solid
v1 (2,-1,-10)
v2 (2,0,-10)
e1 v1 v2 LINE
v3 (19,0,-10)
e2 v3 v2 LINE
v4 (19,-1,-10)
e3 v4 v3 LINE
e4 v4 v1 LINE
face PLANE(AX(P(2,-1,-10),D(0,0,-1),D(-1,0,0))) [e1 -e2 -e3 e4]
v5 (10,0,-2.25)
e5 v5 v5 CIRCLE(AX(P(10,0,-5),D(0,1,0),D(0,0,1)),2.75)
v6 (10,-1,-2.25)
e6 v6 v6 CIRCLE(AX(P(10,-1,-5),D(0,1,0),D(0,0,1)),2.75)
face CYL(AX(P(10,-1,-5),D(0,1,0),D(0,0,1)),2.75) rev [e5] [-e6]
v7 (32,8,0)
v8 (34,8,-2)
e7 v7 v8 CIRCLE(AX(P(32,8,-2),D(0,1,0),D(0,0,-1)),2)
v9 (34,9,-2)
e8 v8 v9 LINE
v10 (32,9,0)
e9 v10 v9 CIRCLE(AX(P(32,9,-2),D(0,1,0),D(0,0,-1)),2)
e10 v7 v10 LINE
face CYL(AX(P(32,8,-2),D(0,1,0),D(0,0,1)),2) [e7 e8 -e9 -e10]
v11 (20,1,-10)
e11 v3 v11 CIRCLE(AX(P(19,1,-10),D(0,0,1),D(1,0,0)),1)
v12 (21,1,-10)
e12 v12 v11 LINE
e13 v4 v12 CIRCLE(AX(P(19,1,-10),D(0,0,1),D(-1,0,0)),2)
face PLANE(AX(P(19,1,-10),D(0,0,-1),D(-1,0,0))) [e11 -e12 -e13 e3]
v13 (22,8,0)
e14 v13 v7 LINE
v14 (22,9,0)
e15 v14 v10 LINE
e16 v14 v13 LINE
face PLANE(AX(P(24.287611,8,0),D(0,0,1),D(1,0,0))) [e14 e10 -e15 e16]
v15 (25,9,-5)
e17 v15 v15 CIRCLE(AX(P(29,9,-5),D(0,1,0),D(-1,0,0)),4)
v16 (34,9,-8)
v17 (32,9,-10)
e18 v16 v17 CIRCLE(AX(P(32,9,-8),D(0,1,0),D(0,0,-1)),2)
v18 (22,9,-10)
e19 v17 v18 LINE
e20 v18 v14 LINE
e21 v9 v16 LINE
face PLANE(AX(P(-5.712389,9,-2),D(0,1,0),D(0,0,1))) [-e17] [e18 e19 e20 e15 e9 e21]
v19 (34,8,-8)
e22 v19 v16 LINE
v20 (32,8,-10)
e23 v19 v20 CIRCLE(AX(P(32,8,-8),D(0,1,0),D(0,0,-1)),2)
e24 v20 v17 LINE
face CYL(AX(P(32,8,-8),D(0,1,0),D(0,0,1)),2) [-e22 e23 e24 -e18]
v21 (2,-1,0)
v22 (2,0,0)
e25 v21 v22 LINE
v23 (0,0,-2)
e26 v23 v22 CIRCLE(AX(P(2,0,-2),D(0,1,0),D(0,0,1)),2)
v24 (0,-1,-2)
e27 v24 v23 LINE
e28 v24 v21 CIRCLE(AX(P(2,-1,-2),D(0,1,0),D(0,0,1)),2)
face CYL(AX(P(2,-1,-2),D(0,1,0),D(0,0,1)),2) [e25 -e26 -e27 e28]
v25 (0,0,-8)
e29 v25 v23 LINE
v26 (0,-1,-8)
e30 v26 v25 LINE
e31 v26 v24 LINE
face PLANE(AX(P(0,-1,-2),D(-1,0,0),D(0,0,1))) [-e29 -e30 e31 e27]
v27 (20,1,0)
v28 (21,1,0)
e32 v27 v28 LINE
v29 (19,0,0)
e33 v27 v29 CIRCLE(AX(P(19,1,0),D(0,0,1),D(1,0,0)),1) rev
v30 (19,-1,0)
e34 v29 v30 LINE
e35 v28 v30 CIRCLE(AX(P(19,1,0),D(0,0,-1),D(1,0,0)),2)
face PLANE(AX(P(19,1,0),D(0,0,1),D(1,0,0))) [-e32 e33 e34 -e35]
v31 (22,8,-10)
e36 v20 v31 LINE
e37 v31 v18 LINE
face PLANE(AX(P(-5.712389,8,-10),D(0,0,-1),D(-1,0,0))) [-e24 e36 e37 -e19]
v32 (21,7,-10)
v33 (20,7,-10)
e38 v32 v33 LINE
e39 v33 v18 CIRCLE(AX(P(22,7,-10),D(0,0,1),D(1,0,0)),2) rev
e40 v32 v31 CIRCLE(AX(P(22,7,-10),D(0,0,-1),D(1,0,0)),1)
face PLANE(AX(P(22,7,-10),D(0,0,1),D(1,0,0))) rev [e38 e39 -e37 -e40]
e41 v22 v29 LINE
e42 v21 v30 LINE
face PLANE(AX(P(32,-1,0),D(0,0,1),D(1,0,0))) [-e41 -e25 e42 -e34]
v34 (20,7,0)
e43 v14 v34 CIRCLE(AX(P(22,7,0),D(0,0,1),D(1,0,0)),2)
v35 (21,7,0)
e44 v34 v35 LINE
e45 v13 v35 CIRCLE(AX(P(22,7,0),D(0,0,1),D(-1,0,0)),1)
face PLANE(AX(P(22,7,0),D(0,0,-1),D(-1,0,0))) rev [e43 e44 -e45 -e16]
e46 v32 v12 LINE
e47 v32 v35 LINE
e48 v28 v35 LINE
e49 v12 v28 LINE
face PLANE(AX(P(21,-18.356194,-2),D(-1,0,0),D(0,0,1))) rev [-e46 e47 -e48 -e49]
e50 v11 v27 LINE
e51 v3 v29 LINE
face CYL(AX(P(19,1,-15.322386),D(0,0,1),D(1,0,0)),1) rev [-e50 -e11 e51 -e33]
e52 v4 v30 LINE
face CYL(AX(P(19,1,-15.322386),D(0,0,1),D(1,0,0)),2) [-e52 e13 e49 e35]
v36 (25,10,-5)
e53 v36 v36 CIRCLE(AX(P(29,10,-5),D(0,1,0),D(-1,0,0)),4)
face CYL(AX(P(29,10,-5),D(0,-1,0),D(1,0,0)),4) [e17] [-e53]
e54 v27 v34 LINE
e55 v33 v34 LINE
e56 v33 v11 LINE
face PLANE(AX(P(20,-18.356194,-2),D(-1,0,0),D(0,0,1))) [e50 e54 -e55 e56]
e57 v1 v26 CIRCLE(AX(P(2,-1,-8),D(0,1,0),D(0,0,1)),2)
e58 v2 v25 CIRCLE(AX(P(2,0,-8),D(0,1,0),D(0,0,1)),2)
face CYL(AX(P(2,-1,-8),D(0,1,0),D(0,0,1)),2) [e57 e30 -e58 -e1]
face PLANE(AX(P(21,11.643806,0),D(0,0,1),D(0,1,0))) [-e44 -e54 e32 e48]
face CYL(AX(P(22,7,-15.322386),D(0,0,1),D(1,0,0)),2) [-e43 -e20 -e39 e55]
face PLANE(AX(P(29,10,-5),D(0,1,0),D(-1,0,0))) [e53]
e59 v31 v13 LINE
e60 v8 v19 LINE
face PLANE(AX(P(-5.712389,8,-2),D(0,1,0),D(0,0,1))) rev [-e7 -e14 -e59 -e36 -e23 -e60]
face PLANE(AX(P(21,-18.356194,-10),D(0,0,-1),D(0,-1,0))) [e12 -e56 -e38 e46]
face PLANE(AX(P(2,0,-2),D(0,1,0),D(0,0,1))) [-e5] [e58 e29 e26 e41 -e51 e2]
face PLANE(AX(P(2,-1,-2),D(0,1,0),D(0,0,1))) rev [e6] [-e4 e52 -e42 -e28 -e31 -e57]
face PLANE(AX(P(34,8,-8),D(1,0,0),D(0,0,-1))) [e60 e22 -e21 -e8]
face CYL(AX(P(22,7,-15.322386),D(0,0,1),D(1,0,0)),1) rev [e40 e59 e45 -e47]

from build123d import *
from build123d.topology import SkipClean

# Parameters (mm, degrees)
SKETCH1_R           = 2.75
BASE_FLANGE1_DEPTH  = 1
JOG1_START          = -10
JOG1_DEPTH          = 10
JOG1_START_2        = -8
JOG1_2_DEPTH        = 6
JOG1_START_3        = 7
JOG1_3_DEPTH        = 1.974011807
JOG1_4_OUTLINE_W    = 1
JOG1_4_OUTLINE_H    = 2
JOG1_4_DEPTH        = 7.152182036
JOG1_START_4        = 8
JOG1_5_DEPTH        = 1
JOG1_6_DEPTH        = 10
JOG1_7_DEPTH        = 10
SKETCH12_R          = 4
BOSS_EXTRUDE1_DEPTH = 1


with BuildPart() as part:
    # Base-Flange1: sheet metal written as solids
    # Sketch1 → Base-Flange1 (new body)
    with BuildSketch(Plane(origin=(0, 0, 0), x_dir=(1, 0, 0), z_dir=(0, 1, 0))):
        with BuildLine():
            Line((0, 2), (0, 8))
            ThreePointArc((0, 8), (0.585786438, 9.414213562), (2, 10))
            Line((2, 10), (32, 10))
            ThreePointArc((32, 10), (33.414213562, 9.414213562), (34, 8))
            Line((34, 8), (34, 2))
            ThreePointArc((34, 2), (33.414213562, 0.585786438), (32, 0))
            Line((32, 0), (2, 0))
            ThreePointArc((2, 0), (0.585786438, 0.585786438), (0, 2))
        make_face()
        with Locations(Location((10, 5, 0), (0, 0, 270))):
            Circle(SKETCH1_R, mode=Mode.SUBTRACT)
    extrude(amount=-BASE_FLANGE1_DEPTH)

    # Jog1: read off the stored shape, not the designer's step
    # Jog1 outline → Jog1 (cut)
    with BuildSketch(Plane.XY.offset(JOG1_START)):
        with BuildLine():
            Line((34, 0), (20.732050807, 0))
            ThreePointArc((20.732050807, 0), (20, -0.732050807), (19, -1))
            Line((19, -1), (34, -1))
            Line((34, -1), (34, 0))
        make_face()
    extrude(amount=JOG1_DEPTH, mode=Mode.SUBTRACT)

    # Jog1 2 outline → Jog1 2 (add)
    with BuildSketch(Plane.XY.offset(JOG1_START_2)):
        with BuildLine():
            Line((21, 1), (21, 7))
            ThreePointArc((21, 7), (21.292893219, 7.707106781), (22, 8))
            Line((22, 8), (34, 8))
            Line((34, 8), (34, 9))
            Line((34, 9), (22, 9))
            ThreePointArc((22, 9), (20.585786438, 8.414213562), (20, 7))
            Line((20, 7), (20, 1))
            ThreePointArc((20, 1), (19.707106781, 0.292893219), (19, 0))
            Line((19, 0), (20.732050807, 0))
            ThreePointArc((20.732050807, 0), (20.931851652, 0.48236191), (21, 1))
        make_face()
    extrude(amount=JOG1_2_DEPTH)

    # Jog1 3 outline → Jog1 3 (add)
    with BuildSketch(Plane(origin=(0, 0, 0), x_dir=(1, 0, 0), z_dir=(0, 1, 0)).offset(JOG1_START_3)):
        with BuildLine():
            Line((20, 10), (20, 8))
            Line((20, 8), (34, 8))
            ThreePointArc((34, 8), (33.414213562, 9.414213562), (32, 10))
            Line((32, 10), (20, 10))
        make_face()
        with BuildLine():
            Line((34, 2), (20, 2))
            Line((20, 2), (20, 0))
            Line((20, 0), (32, 0))
            ThreePointArc((32, 0), (33.414213562, 0.585786438), (34, 2))
        make_face()
    extrude(amount=JOG1_3_DEPTH)

    # Jog1 4 outline → Jog1 4 (add)
    with BuildSketch(Plane(origin=(0, 0, 0), x_dir=(1, 0, 0), z_dir=(0, 1, 0))):
        with Locations((20.5, 9)):
            Rectangle(JOG1_4_OUTLINE_W, JOG1_4_OUTLINE_H)
        with Locations((20.5, 1)):
            Rectangle(JOG1_4_OUTLINE_W, JOG1_4_OUTLINE_H)
    extrude(amount=JOG1_4_DEPTH)

    # Jog1 5 outline → Jog1 5 (add)
    with BuildSketch(Plane(origin=(0, 0, 0), x_dir=(1, 0, 0), z_dir=(0, 1, 0)).offset(JOG1_START_4)):
        with BuildLine():
            Line((32, 10), (21, 10))
            Line((21, 10), (21, 8))
            Line((21, 8), (34, 8))
            ThreePointArc((34, 8), (33.414213562, 9.414213562), (32, 10))
        make_face()
        with BuildLine():
            Line((34, 2), (21, 2))
            Line((21, 2), (21, 0))
            Line((21, 0), (32, 0))
            ThreePointArc((32, 0), (33.414213562, 0.585786438), (34, 2))
        make_face()
    extrude(amount=JOG1_5_DEPTH)

    # Jog1 6 outline → Jog1 6 (cut)
    with SkipClean():  # the faces are left unmerged after this step: merging them gives an invalid solid
        with BuildSketch(Plane.XY.offset(JOG1_START)):
            with BuildLine():
                Line((21, 7), (21, 1))
                ThreePointArc((21, 1), (20.732050807, -1e-09), (19.999999998, -0.732050808))
                Line((19.999999998, -0.732050808), (19.999999995, -1))
                Line((19.999999995, -1), (35, -1))
                Line((35, -1), (35, 8))
                Line((35, 8), (22, 8))
                ThreePointArc((22, 8), (21.292893219, 7.707106781), (21, 7))
            make_face()
            with BuildLine():
                Line((21, 9), (21, 8.974011807))
                Line((21, 8.974011807), (20, 8.974011807))
                Line((20, 8.974011807), (20, 7))
                ThreePointArc((20, 7), (20.585786438, 8.414213562), (22, 9))
                Line((22, 9), (35, 9.000000008))
                Line((35, 9.000000008), (35, 10))
                Line((35, 10), (21.000000006, 10))
                Line((21.000000006, 10), (21, 9))
            make_face()
        extrude(amount=JOG1_6_DEPTH, mode=Mode.SUBTRACT)
    add(part.part.scale(1), mode=Mode.REPLACE)  # the faces are merged on a copy

    # Jog1 7 outline → Jog1 7 (add)
    with BuildSketch(Plane.XY.offset(JOG1_START)):
        with BuildLine():
            ThreePointArc((19, -1), (19.517638089, -0.931851653), (19.999999998, -0.732050808))
            Line((19.999999998, -0.732050808), (19.999999996, 0))
            Line((19.999999996, 0), (20, 1))
            ThreePointArc((20, 1), (19.707106781, 0.292893219), (19, 0))
            Line((19, 0), (18, -1e-09))
            Line((18, -1e-09), (18, -1))
            Line((18, -1), (19, -1))
        make_face()
    extrude(amount=JOG1_7_DEPTH)

    # Sketch12 → Boss-Extrude1 (add)
    with BuildSketch(Plane(origin=(0, 9, 0), x_dir=(1, 0, 0), z_dir=(0, 1, 0))):
        with Locations(Location((29, 5, 0), (0, 0, 180))):
            Circle(SKETCH12_R)
    extrude(amount=BOSS_EXTRUDE1_DEPTH)


solid = part.part
